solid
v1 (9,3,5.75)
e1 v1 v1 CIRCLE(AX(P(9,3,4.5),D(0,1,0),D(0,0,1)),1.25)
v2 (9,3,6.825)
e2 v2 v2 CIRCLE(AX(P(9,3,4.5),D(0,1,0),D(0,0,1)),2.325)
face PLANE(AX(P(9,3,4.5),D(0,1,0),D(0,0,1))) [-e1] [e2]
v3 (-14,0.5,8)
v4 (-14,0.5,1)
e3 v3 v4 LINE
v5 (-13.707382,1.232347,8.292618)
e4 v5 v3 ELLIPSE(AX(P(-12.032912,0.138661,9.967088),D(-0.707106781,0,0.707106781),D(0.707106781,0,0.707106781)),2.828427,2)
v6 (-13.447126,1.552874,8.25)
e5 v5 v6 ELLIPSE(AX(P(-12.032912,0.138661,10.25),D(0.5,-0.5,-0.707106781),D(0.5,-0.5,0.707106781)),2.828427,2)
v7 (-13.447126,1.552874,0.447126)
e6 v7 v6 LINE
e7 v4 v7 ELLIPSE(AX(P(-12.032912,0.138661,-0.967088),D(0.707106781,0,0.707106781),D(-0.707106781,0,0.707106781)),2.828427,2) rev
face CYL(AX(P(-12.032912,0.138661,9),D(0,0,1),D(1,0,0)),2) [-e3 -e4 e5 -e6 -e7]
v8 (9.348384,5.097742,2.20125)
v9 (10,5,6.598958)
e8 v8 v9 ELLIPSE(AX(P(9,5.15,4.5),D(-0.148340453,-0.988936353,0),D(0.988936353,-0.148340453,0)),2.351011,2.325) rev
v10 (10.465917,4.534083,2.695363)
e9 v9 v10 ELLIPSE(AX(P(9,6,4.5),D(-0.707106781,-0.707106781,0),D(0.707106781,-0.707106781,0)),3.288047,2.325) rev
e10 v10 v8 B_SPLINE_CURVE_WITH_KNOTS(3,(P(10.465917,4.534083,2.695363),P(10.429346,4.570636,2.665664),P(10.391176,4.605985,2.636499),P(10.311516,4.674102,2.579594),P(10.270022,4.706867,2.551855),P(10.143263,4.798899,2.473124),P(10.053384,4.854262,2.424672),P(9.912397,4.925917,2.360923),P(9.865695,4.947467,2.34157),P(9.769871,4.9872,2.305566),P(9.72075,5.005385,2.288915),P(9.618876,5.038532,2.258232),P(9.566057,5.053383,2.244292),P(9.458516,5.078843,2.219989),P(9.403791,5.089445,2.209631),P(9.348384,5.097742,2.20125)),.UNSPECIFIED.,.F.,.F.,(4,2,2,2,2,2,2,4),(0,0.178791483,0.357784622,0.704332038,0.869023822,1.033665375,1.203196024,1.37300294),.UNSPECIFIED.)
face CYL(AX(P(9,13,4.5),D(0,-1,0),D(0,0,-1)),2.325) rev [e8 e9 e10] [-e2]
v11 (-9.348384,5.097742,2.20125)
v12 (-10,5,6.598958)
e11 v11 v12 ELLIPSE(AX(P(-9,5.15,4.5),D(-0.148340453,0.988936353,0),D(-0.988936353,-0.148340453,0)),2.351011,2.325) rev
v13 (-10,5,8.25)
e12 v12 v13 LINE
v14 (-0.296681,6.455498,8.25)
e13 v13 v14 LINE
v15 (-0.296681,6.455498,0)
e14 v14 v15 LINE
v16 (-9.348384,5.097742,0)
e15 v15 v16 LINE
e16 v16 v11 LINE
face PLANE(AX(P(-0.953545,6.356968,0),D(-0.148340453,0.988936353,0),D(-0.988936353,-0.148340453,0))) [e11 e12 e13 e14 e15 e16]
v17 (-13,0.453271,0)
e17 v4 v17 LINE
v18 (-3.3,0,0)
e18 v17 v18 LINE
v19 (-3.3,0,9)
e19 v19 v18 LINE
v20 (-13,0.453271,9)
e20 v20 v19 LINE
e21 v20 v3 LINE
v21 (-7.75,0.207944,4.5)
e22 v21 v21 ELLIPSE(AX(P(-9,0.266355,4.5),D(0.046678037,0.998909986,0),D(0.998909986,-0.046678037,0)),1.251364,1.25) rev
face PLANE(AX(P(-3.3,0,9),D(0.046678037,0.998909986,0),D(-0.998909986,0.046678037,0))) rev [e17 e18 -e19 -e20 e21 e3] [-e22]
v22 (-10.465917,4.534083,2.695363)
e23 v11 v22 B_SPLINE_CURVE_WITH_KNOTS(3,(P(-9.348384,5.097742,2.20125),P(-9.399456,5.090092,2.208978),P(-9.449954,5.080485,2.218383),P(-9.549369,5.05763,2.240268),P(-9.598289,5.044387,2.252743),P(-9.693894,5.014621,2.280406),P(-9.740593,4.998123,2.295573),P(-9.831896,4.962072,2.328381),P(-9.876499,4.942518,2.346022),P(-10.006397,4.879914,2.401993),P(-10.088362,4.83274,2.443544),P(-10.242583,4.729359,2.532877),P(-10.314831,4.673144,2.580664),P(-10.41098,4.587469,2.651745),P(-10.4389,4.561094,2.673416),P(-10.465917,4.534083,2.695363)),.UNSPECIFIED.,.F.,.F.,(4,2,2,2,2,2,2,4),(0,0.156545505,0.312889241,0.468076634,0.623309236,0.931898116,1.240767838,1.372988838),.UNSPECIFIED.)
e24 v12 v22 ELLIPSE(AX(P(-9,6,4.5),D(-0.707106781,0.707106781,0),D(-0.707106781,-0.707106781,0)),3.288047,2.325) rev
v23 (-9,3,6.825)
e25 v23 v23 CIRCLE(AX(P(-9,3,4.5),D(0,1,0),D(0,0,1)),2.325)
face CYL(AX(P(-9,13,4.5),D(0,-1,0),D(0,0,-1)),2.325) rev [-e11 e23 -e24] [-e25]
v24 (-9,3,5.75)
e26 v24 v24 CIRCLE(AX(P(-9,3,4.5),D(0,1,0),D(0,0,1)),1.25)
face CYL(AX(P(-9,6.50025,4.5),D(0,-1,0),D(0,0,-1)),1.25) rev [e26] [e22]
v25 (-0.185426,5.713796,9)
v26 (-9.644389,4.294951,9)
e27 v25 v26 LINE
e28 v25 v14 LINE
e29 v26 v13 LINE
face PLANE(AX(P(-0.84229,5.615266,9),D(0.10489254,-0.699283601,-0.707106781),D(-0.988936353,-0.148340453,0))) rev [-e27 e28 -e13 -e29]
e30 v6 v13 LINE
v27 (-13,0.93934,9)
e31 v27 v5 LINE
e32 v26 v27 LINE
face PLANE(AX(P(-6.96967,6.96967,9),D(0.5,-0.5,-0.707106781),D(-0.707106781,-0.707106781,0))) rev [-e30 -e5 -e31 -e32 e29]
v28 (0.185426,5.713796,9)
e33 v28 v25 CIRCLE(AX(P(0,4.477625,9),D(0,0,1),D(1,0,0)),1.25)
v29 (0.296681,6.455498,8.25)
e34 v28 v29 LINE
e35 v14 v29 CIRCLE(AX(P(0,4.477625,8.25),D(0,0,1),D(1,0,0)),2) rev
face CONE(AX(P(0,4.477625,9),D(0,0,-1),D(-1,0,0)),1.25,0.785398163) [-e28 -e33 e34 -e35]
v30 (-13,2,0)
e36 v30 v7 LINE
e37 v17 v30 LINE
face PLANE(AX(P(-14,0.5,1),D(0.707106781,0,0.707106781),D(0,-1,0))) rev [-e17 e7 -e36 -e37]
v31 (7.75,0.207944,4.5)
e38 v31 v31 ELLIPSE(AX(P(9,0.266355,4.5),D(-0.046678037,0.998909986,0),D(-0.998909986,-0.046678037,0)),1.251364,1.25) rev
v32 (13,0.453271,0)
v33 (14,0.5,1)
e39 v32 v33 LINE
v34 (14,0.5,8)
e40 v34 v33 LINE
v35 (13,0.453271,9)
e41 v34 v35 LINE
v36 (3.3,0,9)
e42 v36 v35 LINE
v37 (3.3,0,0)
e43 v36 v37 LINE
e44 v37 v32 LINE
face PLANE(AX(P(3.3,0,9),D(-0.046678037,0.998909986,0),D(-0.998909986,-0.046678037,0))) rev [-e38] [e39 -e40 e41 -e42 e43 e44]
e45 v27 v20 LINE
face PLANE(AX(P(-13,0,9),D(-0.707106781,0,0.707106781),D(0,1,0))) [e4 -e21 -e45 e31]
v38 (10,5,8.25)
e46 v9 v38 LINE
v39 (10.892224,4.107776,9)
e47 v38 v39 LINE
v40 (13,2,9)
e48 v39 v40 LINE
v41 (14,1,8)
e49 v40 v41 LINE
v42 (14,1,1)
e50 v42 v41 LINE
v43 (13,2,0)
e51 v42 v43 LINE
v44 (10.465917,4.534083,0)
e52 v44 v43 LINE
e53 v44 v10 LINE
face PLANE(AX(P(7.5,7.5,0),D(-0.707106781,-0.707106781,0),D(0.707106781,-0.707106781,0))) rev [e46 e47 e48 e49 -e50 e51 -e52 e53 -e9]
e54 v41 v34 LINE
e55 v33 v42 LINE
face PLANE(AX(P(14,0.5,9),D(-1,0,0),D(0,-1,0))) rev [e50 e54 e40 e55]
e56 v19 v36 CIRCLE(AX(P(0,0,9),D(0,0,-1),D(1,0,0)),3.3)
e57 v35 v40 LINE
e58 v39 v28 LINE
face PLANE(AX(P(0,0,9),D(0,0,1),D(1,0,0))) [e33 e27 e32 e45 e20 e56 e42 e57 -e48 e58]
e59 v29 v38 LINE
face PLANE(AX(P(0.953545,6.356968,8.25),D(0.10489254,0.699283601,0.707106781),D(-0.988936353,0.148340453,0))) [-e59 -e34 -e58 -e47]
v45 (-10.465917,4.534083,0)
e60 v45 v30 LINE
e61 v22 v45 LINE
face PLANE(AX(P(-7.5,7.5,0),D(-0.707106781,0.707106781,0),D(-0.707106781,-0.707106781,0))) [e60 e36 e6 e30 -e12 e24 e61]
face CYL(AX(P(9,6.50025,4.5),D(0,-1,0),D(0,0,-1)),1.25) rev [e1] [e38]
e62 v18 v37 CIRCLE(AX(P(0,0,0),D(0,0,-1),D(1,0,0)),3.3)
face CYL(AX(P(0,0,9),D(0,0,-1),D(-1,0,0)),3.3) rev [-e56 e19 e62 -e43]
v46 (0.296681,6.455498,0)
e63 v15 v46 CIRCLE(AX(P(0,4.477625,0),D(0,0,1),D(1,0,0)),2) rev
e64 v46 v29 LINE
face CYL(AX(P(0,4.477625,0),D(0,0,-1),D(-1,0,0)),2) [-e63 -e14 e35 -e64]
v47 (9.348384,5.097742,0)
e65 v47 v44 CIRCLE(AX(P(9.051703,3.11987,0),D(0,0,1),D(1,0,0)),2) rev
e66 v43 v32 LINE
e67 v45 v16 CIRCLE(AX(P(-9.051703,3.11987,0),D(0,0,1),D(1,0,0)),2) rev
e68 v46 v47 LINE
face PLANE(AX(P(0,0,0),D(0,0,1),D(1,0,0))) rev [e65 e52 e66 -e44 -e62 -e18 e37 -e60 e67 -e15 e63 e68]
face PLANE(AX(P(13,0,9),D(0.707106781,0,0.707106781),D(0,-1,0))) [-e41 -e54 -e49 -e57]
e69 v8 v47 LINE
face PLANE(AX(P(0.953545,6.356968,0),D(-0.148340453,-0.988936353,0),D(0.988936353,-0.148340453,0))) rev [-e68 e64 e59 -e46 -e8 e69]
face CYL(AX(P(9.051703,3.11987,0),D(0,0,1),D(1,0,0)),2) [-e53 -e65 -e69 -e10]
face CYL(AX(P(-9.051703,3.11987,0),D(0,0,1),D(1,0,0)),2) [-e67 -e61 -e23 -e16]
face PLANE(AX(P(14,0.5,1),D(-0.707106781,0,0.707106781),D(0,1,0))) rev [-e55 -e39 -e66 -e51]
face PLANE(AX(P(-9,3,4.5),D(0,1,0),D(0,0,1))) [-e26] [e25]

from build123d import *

# Parameters (mm, degrees)
BOSS_EXTRUDE1_DEPTH     = 9
CUT_EXTRUDE1_DEPTH      = 18.867568385
CUT_EXTRUDE1_DEPTH_BACK = 18.867568385
CHAMFER1_SIZE           = 1
SKETCH4_R               = 1.25
CUT_EXTRUDE2_DEPTH      = 18.867568385
CUT_EXTRUDE3_START      = 3
SKETCH5_R               = 2.325
CUT_EXTRUDE3_DEPTH      = 10
FILLET2_R               = 2
CHAMFER3_SIZE           = 0.75


with BuildPart() as part:
    # Sketch1 → Boss-Extrude1 (new body)
    with BuildSketch(Plane.XY):
        with BuildLine():
            Line((-14, 0.5), (-14, 6.5))
            Line((-14, 6.5), (14, 6.5))
            Line((14, 6.5), (14, 0.5))
            Line((14, 0.5), (3.3, 0))
            ThreePointArc((3.3, 0), (0, 3.3), (-3.3, 0))
            Line((-3.3, 0), (-14, 0.5))
        make_face()
    extrude(amount=BOSS_EXTRUDE1_DEPTH)

    # Sketch2 → Cut-Extrude1 (cut, two sides: drawn at the far end of the back side and taken through both)
    with BuildSketch(Plane.XY.offset(9).offset(-CUT_EXTRUDE1_DEPTH_BACK)):
        Polygon((-10, 5), (0, 6.5), (-14, 6.5), (-14, 1), align=None)
        Polygon((14, 6.5), (0, 6.5), (10, 5), (14, 1), align=None)
    extrude(amount=CUT_EXTRUDE1_DEPTH + CUT_EXTRUDE1_DEPTH_BACK, mode=Mode.SUBTRACT)

    # Chamfer1
    chamfer1_edges = [part.edges().sort_by_distance(p)[0] for p in [
        (14, 0.75, 9),
        (-14, 0.75, 0),
        (-14, 0.75, 9),
        (14, 0.75, 0),
    ]]
    chamfer(chamfer1_edges, length=CHAMFER1_SIZE)

    # Sketch4 → Cut-Extrude2 (cut, through all)
    with BuildSketch(Plane(origin=(0, 0, 0), x_dir=(-1, 0, 0), z_dir=(0, 1, 0))):
        with Locations(Location((-9, 4.5, 0), (0, 0, 216.869897646))):
            Circle(SKETCH4_R)
        with Locations(Location((9, 4.5, 0), (0, 0, 323.130102354))):
            Circle(SKETCH4_R)
    extrude(amount=CUT_EXTRUDE2_DEPTH, mode=Mode.SUBTRACT)

    # Sketch5 → Cut-Extrude3 (cut)
    with BuildSketch(Plane(origin=(0, 0, 0), x_dir=(1, 0, 0), z_dir=(0, 1, 0)).offset(CUT_EXTRUDE3_START)):
        with Locations(Location((9, -4.5, 0), (0, 0, 64.525615739))):
            Circle(SKETCH5_R)
        with Locations(Location((-9, -4.5, 0), (0, 0, 115.474384261))):
            Circle(SKETCH5_R)
    extrude(amount=CUT_EXTRUDE3_DEPTH, mode=Mode.SUBTRACT)

    # Fillet2
    # the kernel refuses this fillet: 2 mm, written as the material it takes off along each edge
    with BuildSketch(Plane(origin=(10, 5, -1.647264498), x_dir=(0.7071067811865476, -0.7071067811865476, 0), z_dir=(0, 0, 1)), Plane(origin=(-10, 5, 4.048306423), x_dir=(-0.7071067811865476, -0.7071067811865476, 0), z_dir=(0, 0, -1))) as fillet2_piece_1:
        with BuildLine():
            CenterArc((FILLET2_R * 0.329452899538, -FILLET2_R), FILLET2_R, 90, 36.46923439)
            Line((-FILLET2_R * 0.264938161546, -FILLET2_R * 0.195823858534), (-FILLET2_R * 0.276825982767, -FILLET2_R * 0.179740335704))
            Line((-FILLET2_R * 0.276825982767, -FILLET2_R * 0.179740335704), (-FILLET2_R * 0.00658905799077, FILLET2_R * 0.02))
            Line((-FILLET2_R * 0.00658905799077, FILLET2_R * 0.02), (FILLET2_R * 0.329452899538, FILLET2_R * 0.02))
            Line((FILLET2_R * 0.329452899538, FILLET2_R * 0.02), (FILLET2_R * 0.329452899538, 0))
        make_face()
    extrude(amount=5.695570921, mode=Mode.SUBTRACT)
    with BuildSketch(Plane(origin=(0, 6.5, 9.75), x_dir=(0.9889363528682978, -0.1483404529302431, 0), z_dir=(0, 0, -1))) as fillet2_piece_2:
        with BuildLine():
            CenterArc((FILLET2_R * 0.15, FILLET2_R), FILLET2_R, 252.93846878, 17.06153122)
            Line((-FILLET2_R * 0.143398533007, FILLET2_R * 0.0440097799511), (-FILLET2_R * 0.149266503667, FILLET2_R * 0.0248899755501))
            Line((-FILLET2_R * 0.149266503667, FILLET2_R * 0.0248899755501), (-FILLET2_R * 0.003, -FILLET2_R * 0.02))
            Line((-FILLET2_R * 0.003, -FILLET2_R * 0.02), (FILLET2_R * 0.15, -FILLET2_R * 0.02))
            Line((FILLET2_R * 0.15, -FILLET2_R * 0.02), (FILLET2_R * 0.15, 0))
        make_face()
    extrude(amount=10.5, mode=Mode.SUBTRACT)
    with BuildSketch(Plane(origin=(-14, 1, -0.95470504), x_dir=(0, -1, 0), z_dir=(0, 0, 1))) as fillet2_piece_3:
        with BuildLine():
            CenterArc((0.861339487, 1.967087638), FILLET2_R, 225, 34.591227114)
            Line((-0.552874076, 0.552874076), (-0.581158347, 0.524589804))
            Line((-0.581158347, 0.524589804), (-0.028284271, -0.028284271))
            Line((-0.028284271, -0.028284271), (0, -0.04))
            ThreePointArc((0, -0.04), (0.25, -0.04), (0.49277321, -0.039341753))
            Line((0.49277321, -0.039341753), (0.5, 0))
        make_face()
    extrude(amount=10.90941008, mode=Mode.SUBTRACT)

    # Chamfer3
    # the kernel refuses this chamfer: 0.75 mm, written as the material it takes off along each edge
    with BuildSketch(Plane(origin=(-14.36384086, 0.63615914, 9), x_dir=(0.7068394360706732, -0.7068394360706737, 0.027495876610586747), z_dir=(0.7071067811865477, 0.7071067811865474, 0))) as chamfer3_piece_1:
        Polygon((CHAMFER3_SIZE * 0.999621916911, CHAMFER3_SIZE * 0.0274958766106), (-CHAMFER3_SIZE * 0.0274958766106, CHAMFER3_SIZE * 0.999621916911), (0, 0), align=None)
    extrude(amount=8.100165169, mode=Mode.SUBTRACT)
    with BuildSketch(Plane(origin=(-11.907423096, 4.713886536, 9), x_dir=(0.1482843679136212, -0.988562452757474, 0.027495876610586778), z_dir=(0.9889363528682975, 0.14834045293024473, 0)), Plane(origin=(0.296680906, 6.455497864, 9), x_dir=(-0.14828436791362096, -0.9885624527574741, 0.02749587661058676), z_dir=(0.9889363528682976, -0.14834045293024448, 0))) as chamfer3_piece_2:
        Polygon((CHAMFER3_SIZE * 0.999621916911, CHAMFER3_SIZE * 0.0274958766106), (-CHAMFER3_SIZE * 0.0274958766106, CHAMFER3_SIZE * 0.999621916911), (0, 0), align=None)
    extrude(amount=11.740636449, mode=Mode.SUBTRACT)
    with BuildSketch(Plane(origin=(0, 4.477625158, 9), x_dir=(0.1483404529300489, 0.9889363528683269, 0), z_dir=(0.9889363528683269, -0.1483404529300489, 0))) as chamfer3_piece_3:
        Polygon((2 - CHAMFER3_SIZE, 0), (2, -CHAMFER3_SIZE), (2, 0), align=None)
    revolve(axis=Axis((0, 4.477625158, 9), (0, 0, 1)), revolution_arc=17.06153122, mode=Mode.SUBTRACT)


solid = part.part
